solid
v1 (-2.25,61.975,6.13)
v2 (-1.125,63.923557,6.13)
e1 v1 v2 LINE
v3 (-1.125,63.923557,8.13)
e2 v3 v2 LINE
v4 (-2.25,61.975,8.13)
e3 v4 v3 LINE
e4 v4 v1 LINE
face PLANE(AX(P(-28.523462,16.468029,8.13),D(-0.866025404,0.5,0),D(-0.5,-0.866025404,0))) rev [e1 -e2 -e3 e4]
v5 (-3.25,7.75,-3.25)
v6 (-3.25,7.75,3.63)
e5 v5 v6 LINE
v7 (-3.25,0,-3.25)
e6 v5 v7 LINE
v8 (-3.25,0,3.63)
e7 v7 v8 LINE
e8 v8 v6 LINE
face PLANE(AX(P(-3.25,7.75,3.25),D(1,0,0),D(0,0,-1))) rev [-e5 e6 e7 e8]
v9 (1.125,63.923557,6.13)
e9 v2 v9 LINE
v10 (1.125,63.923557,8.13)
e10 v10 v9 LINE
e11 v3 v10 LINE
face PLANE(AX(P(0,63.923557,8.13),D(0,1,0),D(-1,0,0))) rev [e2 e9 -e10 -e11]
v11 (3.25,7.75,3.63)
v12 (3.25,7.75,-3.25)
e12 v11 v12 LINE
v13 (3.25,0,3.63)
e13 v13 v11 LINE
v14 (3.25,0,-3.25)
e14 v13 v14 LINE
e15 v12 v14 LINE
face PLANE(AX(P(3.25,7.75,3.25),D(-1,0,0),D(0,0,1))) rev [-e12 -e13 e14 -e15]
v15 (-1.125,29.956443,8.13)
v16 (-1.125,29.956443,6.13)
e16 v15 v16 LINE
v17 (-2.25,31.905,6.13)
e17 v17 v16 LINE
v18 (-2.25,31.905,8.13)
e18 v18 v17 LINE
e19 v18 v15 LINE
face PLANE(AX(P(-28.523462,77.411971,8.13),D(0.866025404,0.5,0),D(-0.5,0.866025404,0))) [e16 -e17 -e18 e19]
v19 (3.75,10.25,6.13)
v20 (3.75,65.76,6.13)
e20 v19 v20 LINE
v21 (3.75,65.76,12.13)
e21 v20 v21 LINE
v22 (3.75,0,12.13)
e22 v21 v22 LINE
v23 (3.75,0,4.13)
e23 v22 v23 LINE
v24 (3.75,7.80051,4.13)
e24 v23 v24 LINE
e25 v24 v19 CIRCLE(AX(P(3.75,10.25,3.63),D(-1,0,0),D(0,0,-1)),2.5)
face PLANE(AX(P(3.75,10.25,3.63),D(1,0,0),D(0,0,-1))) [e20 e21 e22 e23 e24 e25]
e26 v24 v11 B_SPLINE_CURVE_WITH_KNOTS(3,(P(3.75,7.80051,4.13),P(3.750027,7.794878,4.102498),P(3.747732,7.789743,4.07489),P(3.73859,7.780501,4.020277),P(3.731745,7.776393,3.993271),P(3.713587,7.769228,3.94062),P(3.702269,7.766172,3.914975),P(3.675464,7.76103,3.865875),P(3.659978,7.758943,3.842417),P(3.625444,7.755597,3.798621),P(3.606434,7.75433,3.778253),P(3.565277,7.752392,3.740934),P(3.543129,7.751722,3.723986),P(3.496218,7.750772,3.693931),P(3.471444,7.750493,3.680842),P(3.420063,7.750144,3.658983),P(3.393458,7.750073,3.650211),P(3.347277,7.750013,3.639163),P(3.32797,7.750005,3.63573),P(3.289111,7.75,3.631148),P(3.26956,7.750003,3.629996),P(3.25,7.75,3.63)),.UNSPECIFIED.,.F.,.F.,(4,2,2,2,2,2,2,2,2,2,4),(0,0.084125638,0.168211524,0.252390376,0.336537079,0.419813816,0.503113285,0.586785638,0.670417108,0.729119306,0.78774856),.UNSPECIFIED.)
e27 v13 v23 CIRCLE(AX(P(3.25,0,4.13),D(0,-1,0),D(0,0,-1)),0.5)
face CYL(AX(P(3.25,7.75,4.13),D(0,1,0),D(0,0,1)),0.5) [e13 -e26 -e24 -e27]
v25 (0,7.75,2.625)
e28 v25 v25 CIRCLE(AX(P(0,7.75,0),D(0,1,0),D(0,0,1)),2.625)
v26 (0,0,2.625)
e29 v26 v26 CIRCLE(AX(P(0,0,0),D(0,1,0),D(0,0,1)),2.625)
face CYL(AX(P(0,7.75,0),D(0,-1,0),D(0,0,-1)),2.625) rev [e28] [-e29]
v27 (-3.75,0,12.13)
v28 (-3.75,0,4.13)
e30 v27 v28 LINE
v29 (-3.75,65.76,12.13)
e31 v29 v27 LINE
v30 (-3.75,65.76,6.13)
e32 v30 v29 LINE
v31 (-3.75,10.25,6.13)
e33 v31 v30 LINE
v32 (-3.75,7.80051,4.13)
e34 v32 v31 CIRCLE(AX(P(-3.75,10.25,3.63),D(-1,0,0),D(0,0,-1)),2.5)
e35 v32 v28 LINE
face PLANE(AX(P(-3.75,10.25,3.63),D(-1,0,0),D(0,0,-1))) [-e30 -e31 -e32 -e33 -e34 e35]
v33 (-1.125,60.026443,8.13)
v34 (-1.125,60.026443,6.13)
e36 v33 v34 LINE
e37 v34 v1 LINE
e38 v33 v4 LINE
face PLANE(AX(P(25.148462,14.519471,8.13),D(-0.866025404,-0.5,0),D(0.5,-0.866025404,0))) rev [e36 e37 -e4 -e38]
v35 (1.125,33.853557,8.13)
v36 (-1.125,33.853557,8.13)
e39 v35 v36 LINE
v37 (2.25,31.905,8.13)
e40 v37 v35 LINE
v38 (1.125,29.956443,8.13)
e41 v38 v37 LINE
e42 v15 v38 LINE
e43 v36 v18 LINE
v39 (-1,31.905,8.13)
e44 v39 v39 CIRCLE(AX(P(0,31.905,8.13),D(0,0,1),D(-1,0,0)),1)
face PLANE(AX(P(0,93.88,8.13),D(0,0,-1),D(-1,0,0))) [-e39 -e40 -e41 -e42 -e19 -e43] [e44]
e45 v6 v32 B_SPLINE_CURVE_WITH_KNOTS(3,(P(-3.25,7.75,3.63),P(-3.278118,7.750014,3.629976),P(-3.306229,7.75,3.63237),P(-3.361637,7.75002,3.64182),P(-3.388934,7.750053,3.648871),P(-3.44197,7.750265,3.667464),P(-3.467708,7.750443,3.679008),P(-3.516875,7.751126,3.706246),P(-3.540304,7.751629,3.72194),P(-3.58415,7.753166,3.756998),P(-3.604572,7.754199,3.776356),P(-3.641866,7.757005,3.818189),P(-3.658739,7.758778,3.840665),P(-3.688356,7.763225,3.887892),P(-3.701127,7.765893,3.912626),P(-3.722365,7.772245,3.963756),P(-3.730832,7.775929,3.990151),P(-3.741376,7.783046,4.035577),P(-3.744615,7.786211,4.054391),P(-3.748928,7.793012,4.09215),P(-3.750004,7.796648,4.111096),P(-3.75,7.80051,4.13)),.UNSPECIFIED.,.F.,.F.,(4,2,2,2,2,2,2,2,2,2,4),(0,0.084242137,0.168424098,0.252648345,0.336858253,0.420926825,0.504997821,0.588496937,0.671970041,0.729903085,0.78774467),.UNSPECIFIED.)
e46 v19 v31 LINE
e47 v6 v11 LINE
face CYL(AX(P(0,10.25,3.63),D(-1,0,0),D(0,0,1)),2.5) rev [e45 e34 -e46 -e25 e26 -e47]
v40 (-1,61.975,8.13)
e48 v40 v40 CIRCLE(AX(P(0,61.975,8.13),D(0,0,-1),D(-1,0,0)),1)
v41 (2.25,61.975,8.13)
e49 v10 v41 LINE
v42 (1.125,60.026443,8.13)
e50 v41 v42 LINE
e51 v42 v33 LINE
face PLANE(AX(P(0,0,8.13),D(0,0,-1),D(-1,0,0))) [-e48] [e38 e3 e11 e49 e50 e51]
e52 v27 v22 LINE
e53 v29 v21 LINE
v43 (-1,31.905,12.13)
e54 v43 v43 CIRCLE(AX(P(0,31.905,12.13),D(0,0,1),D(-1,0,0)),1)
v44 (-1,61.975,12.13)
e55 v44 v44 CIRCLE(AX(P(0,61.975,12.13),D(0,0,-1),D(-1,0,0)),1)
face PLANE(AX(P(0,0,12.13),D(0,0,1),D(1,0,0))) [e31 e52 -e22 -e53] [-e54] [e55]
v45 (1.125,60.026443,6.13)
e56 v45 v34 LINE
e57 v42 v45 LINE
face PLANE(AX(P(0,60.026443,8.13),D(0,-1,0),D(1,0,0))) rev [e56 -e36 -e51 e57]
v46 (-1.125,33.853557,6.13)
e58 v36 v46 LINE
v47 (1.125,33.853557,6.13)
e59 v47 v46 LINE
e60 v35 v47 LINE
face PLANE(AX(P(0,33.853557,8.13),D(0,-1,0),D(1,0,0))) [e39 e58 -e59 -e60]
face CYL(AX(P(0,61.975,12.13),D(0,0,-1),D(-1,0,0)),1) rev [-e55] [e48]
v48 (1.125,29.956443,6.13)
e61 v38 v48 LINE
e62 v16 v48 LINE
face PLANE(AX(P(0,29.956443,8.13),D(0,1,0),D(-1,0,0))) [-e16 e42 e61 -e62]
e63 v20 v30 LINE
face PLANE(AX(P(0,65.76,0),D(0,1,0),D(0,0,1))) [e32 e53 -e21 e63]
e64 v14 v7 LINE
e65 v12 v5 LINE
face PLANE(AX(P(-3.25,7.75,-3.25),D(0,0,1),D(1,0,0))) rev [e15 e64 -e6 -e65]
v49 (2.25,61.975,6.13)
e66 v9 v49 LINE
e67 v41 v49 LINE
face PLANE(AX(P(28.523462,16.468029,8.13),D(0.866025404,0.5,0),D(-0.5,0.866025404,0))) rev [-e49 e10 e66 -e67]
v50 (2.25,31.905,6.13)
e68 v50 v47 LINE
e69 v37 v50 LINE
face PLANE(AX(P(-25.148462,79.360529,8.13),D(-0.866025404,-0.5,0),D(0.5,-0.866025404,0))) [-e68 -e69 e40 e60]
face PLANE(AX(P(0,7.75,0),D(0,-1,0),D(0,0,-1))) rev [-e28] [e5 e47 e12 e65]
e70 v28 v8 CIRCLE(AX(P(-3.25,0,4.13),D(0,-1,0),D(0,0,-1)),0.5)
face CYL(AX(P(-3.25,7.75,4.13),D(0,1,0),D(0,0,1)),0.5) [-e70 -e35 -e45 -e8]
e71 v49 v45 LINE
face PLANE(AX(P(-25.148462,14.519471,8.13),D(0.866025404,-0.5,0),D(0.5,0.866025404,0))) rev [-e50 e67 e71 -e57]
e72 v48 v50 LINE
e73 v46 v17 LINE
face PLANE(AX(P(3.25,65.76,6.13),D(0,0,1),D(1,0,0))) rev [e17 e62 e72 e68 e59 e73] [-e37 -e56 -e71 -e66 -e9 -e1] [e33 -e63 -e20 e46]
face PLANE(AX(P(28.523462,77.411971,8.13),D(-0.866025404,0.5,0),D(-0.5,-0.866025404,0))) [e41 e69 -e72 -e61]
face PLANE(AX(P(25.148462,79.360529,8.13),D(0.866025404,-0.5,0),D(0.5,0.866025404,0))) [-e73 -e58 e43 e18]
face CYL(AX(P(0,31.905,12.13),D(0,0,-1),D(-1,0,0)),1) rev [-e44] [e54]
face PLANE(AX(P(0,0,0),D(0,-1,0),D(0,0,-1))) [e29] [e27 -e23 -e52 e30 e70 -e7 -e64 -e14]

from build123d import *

# Parameters (mm, degrees)
SKETCH1_W           = 6.5
SKETCH1_H           = 6.5
SKETCH1_R           = 2.625
BOSS_EXTRUDE1_DEPTH = 7.75
SKETCH2_W           = 6.5
SKETCH2_H           = 7.75
BOSS_EXTRUDE2_DEPTH = 8.88
SKETCH3_W           = 6.5
SKETCH3_H           = 6
BOSS_EXTRUDE3_DEPTH = 58.01
FILLET1_R           = 2.5
BOSS_EXTRUDE4_START = 0.5
BOSS_EXTRUDE4_DEPTH = 0.5
FILLET2_R           = 0.5
FILLET3_R           = 0.5
SKETCH6_R           = 1
CUT_EXTRUDE3_DEPTH  = 67.53137982
CUT_EXTRUDE4_DEPTH  = 2


with BuildPart() as part:
    # Sketch1 → Boss-Extrude1 (new body)
    with BuildSketch(Plane(origin=(0, 0, 0), x_dir=(1, 0, 0), z_dir=(0, 1, 0))):
        Rectangle(SKETCH1_W, SKETCH1_H)
        with Locations(Location((0, 0, 0), (0, 0, 270))):
            Circle(SKETCH1_R, mode=Mode.SUBTRACT)
    extrude(amount=BOSS_EXTRUDE1_DEPTH)

    # Sketch2 → Boss-Extrude2 (add)
    with BuildSketch(Plane.XY.offset(3.25)):
        with Locations((0, 3.875)):
            Rectangle(SKETCH2_W, SKETCH2_H)
    extrude(amount=BOSS_EXTRUDE2_DEPTH)

    # Sketch3 → Boss-Extrude3 (add)
    with BuildSketch(Plane(origin=(0, 7.75, 0), x_dir=(1, 0, 0), z_dir=(0, 1, 0))):
        with Locations((0, -9.13)):
            Rectangle(SKETCH3_W, SKETCH3_H)
    extrude(amount=BOSS_EXTRUDE3_DEPTH)

    # Fillet1
    fillet1_edges = [part.edges().sort_by_distance(p)[0] for p in [
        (0, 7.75, 6.13),
    ]]
    fillet(fillet1_edges, radius=FILLET1_R)

    # Sketch4 → Boss-Extrude4 (add)
    with BuildSketch(Plane(origin=(3.25, 0, 0), x_dir=(0, 0, -1), z_dir=(1, 0, 0)).offset(BOSS_EXTRUDE4_START)):
        with BuildLine():
            Line((-3.63, 7.75), (-3.63, 0))
            Line((-3.63, 0), (-12.13, 0))
            Line((-12.13, 0), (-12.13, 65.76))
            Line((-12.13, 65.76), (-6.13, 65.76))
            Line((-6.13, 65.76), (-6.13, 10.25))
            ThreePointArc((-6.13, 10.25), (-5.397766953, 8.482233047), (-3.63, 7.75))
        make_face()
    boss_extrude4 = extrude(amount=-BOSS_EXTRUDE4_DEPTH)

    # Fillet2
    fillet2_edges = [part.edges().sort_by_distance(p)[0] for p in [
        (3.75, 3.875, 3.63),
    ]]
    fillet(fillet2_edges, radius=FILLET2_R - 0.0001)  # a hair under: the kernel refuses the full size

    # Mirror1: Boss-Extrude4 across plane
    add(boss_extrude4.mirror(Plane(origin=(0, 0, 0), x_dir=(0, 0, 1), z_dir=(1, 0, 0))))

    # Fillet3
    fillet3_edges = [part.edges().sort_by_distance(p)[0] for p in [
        (-3.75, 3.875, 3.63),
    ]]
    fillet(fillet3_edges, radius=FILLET3_R - 0.0001)  # a hair under: the kernel refuses the full size

    # Sketch6 → Cut-Extrude3 (cut, through all)
    with BuildSketch(Plane(origin=(0, 0, 6.13), x_dir=(-1, 0, 0), z_dir=(0, 0, -1))):
        with Locations((0, 61.975)):
            Circle(SKETCH6_R)
    cut_extrude3 = extrude(amount=-CUT_EXTRUDE3_DEPTH, mode=Mode.SUBTRACT)

    # Sketch6<3> → Cut-Extrude4 (cut)
    with BuildSketch(Plane(origin=(0, 0, 6.13), x_dir=(-1, 0, 0), z_dir=(0, 0, -1))):
        Polygon((2.25, 61.975), (1.125, 63.923557159), (-1.125, 63.923557159), (-2.25, 61.975), (-1.125, 60.026442841), (1.125, 60.026442841), align=None)
    cut_extrude4 = extrude(amount=-CUT_EXTRUDE4_DEPTH, mode=Mode.SUBTRACT)

    # Mirror2: Cut-Extrude3, Cut-Extrude4 across plane
    add(cut_extrude3.mirror(Plane.ZX.offset(46.94)), mode=Mode.SUBTRACT)
    add(cut_extrude4.mirror(Plane.ZX.offset(46.94)), mode=Mode.SUBTRACT)


solid = part.part
